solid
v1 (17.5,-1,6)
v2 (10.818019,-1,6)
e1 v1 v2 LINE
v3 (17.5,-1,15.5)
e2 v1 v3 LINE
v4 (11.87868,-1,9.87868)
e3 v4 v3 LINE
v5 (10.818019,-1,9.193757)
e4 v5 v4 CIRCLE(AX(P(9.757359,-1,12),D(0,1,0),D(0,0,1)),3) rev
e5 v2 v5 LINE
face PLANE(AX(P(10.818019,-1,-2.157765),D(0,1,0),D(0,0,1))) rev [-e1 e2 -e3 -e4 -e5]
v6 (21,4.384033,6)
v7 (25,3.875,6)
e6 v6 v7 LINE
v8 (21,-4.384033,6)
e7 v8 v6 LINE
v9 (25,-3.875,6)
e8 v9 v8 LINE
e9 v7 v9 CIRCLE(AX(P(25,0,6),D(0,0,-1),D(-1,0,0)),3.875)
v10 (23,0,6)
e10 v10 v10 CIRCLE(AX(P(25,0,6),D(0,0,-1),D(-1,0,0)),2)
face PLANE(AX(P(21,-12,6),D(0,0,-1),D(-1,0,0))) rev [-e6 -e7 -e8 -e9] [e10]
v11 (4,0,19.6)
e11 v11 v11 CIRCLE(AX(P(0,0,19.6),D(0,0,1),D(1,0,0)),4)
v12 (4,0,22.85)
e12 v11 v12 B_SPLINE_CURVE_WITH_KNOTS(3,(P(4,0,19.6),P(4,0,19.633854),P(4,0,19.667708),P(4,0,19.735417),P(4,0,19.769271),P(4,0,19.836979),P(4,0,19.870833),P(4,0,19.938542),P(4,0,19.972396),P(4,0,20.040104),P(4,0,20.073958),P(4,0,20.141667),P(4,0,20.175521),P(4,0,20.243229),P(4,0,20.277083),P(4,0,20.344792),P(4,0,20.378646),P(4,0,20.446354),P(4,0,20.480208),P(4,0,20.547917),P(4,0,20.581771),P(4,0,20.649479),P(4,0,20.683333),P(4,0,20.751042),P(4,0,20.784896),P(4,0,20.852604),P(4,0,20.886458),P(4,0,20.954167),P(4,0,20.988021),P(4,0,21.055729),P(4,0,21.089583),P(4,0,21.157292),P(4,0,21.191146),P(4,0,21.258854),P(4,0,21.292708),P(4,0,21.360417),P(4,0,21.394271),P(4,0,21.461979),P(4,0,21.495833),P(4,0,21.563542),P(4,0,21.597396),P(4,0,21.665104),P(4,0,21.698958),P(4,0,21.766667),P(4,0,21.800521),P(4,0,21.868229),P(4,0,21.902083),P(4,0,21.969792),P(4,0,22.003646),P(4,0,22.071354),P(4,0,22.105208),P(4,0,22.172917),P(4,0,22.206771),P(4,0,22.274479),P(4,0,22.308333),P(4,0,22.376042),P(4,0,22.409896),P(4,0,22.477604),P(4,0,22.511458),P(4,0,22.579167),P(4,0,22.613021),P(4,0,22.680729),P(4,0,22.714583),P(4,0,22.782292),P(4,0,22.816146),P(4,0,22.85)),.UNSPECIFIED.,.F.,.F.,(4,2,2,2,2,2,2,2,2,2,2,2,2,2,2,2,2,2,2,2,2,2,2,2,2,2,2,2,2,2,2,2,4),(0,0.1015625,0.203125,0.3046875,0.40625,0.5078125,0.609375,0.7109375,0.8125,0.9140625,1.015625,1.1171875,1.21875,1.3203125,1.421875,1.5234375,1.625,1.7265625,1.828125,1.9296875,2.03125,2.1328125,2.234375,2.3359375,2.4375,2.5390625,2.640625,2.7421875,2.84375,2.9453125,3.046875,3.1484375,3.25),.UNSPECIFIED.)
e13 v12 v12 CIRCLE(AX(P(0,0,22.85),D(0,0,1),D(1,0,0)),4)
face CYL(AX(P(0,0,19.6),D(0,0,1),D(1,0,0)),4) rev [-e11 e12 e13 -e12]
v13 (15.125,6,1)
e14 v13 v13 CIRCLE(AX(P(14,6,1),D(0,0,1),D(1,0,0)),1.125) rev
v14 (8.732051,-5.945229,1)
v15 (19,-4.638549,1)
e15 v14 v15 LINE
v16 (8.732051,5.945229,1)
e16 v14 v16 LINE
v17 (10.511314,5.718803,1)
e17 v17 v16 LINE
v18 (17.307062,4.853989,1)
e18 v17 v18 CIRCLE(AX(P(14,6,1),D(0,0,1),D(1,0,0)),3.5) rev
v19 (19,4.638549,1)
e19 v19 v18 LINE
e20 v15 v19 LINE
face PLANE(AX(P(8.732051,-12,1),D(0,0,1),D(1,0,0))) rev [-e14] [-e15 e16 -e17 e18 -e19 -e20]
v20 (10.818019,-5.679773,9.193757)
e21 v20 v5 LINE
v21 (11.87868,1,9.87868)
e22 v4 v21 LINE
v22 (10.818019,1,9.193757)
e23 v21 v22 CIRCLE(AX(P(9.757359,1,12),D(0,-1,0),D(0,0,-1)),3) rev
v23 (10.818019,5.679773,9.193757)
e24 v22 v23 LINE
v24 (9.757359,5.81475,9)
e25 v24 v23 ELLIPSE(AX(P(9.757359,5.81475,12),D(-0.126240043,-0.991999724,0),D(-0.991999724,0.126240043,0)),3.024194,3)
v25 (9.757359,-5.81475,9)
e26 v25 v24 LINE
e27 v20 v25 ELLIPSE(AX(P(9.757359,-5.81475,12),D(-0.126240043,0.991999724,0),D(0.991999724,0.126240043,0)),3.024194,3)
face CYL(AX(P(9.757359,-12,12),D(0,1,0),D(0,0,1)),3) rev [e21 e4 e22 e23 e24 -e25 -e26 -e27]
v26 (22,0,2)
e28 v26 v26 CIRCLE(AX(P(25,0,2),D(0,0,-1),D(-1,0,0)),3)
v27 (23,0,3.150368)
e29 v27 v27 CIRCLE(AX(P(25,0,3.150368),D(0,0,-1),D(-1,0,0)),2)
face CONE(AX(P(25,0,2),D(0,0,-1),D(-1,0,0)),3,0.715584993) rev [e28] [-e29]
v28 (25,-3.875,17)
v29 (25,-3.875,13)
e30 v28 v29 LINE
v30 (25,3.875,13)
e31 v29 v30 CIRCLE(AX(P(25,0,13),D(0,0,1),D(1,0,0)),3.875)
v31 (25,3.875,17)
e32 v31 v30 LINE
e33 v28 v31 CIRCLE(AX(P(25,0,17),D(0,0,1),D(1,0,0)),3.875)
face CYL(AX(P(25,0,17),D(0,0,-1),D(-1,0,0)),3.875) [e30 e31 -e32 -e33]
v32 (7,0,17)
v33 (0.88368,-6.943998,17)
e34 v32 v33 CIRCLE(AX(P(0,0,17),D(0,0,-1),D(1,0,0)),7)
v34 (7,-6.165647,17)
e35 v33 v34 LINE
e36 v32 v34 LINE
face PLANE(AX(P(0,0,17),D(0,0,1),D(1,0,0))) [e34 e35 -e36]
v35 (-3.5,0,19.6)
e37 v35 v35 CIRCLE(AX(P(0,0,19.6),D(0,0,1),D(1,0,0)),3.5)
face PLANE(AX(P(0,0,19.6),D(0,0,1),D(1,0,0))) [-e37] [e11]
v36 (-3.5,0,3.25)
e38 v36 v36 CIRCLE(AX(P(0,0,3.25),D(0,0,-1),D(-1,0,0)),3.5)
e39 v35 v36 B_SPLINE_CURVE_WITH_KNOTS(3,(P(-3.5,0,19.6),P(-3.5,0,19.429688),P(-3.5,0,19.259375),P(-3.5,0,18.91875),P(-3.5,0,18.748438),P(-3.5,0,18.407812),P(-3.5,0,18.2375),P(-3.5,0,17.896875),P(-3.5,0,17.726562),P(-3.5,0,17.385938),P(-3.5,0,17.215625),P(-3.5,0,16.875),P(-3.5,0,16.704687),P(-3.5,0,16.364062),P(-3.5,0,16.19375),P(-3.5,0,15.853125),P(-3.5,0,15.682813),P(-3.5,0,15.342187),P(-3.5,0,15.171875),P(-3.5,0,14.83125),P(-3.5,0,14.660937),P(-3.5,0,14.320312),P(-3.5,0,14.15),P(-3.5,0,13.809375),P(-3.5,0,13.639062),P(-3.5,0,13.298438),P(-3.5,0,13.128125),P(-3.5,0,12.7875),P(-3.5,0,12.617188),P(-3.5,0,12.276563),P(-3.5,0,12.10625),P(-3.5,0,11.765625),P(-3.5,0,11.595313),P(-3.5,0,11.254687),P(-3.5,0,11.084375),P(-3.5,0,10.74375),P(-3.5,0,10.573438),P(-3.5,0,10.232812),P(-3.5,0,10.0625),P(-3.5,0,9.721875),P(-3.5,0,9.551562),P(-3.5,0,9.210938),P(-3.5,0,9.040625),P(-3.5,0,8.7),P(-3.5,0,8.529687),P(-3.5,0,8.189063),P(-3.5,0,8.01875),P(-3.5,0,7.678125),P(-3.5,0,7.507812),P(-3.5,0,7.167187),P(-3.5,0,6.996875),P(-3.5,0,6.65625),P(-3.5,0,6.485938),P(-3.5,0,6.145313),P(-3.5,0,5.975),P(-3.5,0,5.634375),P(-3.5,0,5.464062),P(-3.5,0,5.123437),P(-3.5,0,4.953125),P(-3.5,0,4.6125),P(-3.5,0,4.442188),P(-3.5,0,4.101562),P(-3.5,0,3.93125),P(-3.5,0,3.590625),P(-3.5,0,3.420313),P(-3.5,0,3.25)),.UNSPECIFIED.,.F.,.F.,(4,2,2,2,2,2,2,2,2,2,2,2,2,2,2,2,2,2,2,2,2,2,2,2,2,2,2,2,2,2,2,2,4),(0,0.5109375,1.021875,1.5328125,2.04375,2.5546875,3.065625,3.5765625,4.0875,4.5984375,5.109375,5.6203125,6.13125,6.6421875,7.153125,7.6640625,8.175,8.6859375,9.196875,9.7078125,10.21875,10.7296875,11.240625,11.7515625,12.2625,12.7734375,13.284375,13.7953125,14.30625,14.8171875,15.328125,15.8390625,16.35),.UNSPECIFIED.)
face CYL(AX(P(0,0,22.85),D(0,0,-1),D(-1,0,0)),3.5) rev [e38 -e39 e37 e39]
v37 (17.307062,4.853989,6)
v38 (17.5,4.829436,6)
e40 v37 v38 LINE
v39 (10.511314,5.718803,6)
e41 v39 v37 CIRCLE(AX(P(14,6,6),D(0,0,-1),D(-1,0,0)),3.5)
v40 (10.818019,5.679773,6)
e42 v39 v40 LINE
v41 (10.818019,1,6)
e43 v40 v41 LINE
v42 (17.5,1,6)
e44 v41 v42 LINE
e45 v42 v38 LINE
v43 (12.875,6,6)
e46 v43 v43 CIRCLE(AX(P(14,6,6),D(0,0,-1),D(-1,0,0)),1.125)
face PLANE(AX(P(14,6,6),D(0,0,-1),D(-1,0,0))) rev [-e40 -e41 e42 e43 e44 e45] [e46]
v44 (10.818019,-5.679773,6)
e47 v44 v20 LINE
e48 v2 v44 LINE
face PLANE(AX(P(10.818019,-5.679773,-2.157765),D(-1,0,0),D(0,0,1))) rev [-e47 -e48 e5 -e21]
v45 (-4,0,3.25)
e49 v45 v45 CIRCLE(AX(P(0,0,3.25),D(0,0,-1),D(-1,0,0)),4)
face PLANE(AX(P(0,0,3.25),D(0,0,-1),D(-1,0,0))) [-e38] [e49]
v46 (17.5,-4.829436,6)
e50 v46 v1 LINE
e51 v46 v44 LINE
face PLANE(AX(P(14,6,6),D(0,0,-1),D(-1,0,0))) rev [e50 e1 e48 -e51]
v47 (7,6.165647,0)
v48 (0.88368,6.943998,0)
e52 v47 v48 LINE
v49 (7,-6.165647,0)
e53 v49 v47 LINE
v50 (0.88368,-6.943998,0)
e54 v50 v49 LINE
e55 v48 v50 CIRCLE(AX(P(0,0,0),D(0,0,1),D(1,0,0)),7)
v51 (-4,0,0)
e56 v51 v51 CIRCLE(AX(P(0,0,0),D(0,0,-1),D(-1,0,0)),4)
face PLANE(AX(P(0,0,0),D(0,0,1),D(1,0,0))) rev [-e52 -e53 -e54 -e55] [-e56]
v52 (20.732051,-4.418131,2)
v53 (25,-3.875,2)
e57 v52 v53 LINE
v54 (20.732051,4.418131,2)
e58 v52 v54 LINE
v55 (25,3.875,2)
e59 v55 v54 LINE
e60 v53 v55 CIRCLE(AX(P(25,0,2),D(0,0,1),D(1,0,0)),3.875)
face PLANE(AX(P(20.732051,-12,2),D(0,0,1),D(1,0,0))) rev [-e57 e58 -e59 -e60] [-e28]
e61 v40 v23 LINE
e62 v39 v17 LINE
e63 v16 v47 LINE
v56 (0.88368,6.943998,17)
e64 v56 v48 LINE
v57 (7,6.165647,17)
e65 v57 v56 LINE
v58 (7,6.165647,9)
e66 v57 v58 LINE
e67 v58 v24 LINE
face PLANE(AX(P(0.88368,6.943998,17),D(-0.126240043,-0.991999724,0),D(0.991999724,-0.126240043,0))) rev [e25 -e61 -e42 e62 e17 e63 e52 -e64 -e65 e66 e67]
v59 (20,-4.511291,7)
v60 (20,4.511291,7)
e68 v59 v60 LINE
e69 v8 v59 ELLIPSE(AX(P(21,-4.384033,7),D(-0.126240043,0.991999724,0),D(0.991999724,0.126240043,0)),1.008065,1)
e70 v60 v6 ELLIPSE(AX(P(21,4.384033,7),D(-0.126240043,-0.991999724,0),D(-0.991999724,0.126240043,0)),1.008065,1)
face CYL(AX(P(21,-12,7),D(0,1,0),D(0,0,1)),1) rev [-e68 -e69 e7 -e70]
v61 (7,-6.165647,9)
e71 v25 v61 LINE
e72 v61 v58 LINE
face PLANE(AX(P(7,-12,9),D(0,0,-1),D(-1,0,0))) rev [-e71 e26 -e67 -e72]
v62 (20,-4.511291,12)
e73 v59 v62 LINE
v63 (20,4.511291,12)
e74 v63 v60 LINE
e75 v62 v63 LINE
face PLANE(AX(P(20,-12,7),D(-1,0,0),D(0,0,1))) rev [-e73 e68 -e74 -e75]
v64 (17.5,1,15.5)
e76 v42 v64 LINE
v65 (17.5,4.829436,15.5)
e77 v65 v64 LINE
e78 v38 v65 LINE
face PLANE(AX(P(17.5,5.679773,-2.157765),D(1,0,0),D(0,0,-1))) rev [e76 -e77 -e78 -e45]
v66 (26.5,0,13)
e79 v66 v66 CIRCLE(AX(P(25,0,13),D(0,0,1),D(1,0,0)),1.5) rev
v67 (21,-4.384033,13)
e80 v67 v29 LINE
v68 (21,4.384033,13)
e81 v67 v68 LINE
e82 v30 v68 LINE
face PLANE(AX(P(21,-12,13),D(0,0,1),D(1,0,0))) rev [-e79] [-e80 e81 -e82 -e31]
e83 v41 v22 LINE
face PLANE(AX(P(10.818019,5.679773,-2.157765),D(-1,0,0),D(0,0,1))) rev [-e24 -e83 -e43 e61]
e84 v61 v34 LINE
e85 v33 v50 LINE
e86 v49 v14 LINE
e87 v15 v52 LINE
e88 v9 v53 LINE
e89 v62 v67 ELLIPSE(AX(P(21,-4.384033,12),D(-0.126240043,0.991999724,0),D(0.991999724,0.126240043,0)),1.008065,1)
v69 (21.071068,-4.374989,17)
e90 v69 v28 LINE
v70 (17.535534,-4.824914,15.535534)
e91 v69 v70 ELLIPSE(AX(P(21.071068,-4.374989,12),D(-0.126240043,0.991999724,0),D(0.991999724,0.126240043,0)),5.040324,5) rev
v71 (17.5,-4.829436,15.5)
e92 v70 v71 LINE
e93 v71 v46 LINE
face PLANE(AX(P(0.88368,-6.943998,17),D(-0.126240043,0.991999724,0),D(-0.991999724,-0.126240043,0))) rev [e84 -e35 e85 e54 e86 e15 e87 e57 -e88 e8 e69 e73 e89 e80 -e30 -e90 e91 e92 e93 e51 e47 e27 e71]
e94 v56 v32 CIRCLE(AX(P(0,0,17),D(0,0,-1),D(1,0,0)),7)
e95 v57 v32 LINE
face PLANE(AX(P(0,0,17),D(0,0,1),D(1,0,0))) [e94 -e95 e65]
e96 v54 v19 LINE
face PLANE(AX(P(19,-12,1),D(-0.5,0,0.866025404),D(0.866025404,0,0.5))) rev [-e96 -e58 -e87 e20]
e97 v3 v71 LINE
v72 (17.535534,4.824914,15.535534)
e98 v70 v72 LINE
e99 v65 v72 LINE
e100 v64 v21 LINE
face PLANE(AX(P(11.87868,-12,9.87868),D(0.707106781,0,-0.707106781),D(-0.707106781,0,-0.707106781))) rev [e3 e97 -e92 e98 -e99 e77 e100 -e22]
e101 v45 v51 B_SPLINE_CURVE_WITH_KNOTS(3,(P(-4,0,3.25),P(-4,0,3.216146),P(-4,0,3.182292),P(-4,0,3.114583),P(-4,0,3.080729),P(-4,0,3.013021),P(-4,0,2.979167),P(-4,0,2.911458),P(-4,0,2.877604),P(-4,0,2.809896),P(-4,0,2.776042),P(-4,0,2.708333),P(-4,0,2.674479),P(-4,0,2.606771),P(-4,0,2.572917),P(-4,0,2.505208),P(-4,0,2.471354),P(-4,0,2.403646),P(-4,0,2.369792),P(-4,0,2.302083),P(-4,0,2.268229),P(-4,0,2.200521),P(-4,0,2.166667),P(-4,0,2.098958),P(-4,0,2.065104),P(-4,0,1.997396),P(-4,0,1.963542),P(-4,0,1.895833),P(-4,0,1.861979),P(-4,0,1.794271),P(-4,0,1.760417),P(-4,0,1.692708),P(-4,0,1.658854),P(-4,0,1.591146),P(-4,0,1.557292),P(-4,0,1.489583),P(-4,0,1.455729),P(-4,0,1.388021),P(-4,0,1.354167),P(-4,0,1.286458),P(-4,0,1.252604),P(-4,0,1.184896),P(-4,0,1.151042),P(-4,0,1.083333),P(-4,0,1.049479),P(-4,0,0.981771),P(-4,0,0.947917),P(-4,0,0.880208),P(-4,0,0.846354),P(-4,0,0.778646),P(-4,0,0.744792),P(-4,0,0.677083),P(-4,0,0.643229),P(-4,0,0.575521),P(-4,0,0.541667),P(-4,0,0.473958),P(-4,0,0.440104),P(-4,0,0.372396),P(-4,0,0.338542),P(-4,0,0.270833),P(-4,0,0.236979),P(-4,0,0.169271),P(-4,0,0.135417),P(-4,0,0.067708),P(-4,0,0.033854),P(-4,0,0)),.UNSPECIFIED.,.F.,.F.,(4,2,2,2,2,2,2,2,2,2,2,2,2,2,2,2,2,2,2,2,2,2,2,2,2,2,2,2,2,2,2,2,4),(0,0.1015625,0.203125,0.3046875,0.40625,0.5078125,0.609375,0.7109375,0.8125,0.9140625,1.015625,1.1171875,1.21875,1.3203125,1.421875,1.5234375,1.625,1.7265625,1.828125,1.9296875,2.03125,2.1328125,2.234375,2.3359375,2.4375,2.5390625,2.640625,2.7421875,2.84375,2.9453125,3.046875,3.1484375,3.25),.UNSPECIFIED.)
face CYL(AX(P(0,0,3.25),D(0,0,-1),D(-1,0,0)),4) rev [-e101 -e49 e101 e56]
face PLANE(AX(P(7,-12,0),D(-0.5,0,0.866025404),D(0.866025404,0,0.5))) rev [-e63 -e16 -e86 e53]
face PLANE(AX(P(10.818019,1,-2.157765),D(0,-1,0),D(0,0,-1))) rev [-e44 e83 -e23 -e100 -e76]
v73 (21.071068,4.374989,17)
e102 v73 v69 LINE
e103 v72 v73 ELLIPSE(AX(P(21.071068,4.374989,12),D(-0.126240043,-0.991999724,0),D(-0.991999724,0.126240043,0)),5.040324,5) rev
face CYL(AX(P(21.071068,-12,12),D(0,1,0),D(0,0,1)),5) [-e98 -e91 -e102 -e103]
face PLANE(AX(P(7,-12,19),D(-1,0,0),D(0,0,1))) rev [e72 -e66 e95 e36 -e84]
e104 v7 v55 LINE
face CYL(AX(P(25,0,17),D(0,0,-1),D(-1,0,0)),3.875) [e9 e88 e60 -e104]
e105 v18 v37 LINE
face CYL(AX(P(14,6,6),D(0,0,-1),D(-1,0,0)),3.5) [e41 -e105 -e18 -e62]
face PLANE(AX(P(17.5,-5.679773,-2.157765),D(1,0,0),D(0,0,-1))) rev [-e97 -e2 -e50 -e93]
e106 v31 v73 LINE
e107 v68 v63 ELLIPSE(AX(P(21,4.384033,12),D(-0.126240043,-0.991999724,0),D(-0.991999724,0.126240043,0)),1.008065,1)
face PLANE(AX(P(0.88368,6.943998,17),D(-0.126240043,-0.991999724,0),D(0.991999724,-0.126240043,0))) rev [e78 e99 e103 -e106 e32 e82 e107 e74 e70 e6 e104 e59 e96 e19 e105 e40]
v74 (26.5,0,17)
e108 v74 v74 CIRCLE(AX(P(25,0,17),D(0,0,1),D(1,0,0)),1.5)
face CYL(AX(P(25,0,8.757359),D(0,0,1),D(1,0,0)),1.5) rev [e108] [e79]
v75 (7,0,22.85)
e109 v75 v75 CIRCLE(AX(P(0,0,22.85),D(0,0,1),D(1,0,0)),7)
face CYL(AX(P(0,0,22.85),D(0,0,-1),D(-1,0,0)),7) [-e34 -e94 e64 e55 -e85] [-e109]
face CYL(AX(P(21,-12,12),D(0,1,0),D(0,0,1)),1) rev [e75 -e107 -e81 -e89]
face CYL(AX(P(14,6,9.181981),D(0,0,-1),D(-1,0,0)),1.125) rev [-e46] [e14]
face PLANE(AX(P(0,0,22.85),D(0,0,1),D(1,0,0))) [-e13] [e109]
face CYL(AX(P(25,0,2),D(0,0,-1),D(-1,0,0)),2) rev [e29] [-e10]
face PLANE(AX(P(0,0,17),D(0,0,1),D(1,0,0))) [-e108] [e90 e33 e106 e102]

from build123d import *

# Parameters (mm, degrees)
SKETCH1_R                = 7
SKETCH1_R_2              = 3.5
CYLINDER_DEPTH           = 22.85
SKETCH2_R                = 4
BORE_1_DEPTH             = 3.25
BORE_START               = -3.25
SKETCH3_R                = 4
BORE_2_DEPTH             = 3.25
ARM_DEPTH                = 17
SKETCH5_R                = 3.5
OUTER_HOLE_SURFACE_DEPTH = 6
SKETCH6_R                = 1.125
OUTER_HOLE_DEPTH         = 6
SIDE_FEATURES_DEPTH      = 22
RIB_START                = -11
SKETCH10_W               = 6.681980515
SKETCH10_H               = 4.679772507
RIB_DEPTH                = 9.5
SKETCH13_R               = 1.5
BOTTOM_HOLE_DEPTH        = 4


# Read off the part's stored shape, not the designer's step: Top Counter-sunk
with BuildPart() as part:
    # Sketch1 → Cylinder (new body)
    with BuildSketch(Plane.XY):
        with Locations(Location((0, 0, 0), (0, 0, 180))):
            Circle(SKETCH1_R)
        with Locations(Location((0, 0, 0), (0, 0, 180))):
            Circle(SKETCH1_R_2, mode=Mode.SUBTRACT)
    extrude(amount=CYLINDER_DEPTH)

    # Sketch2 → Bore 1 (cut)
    with BuildSketch(Plane.XY.offset(22.85)):
        Circle(SKETCH2_R)
    extrude(amount=-BORE_1_DEPTH, mode=Mode.SUBTRACT)

    # Sketch3 → Bore 2 (cut)
    with BuildSketch(Plane(origin=(0, 0, 0), x_dir=(-1, 0, 0), z_dir=(0, 0, -1)).offset(BORE_START)):
        with Locations(Location((0, 0, 0), (0, 0, 180))):
            Circle(SKETCH3_R)
    extrude(amount=BORE_2_DEPTH, mode=Mode.SUBTRACT)

    # Sketch4 → Arm (add)
    with BuildSketch(Plane.XY):
        with BuildLine():
            Line((0.8836803, 6.943998065), (25, 3.875))
            ThreePointArc((25, 3.875), (28.875, 0), (25, -3.875))
            Line((25, -3.875), (0.8836803, -6.943998065))
            ThreePointArc((0.8836803, -6.943998065), (7, 0), (0.8836803, 6.943998065))
        make_face()
    extrude(amount=ARM_DEPTH)

    # Sketch5 → Outer Hole surface (add)
    with BuildSketch(Plane(origin=(0, 0, 0), x_dir=(-1, 0, 0), z_dir=(0, 0, -1))):
        with Locations((-14, 6)):
            Circle(SKETCH5_R)
    extrude(amount=-OUTER_HOLE_SURFACE_DEPTH)

    # Sketch6 → Outer hole (cut)
    with BuildSketch(Plane(origin=(0, 0, 0), x_dir=(-1, 0, 0), z_dir=(0, 0, -1))):
        with Locations((-14, 6)):
            Circle(SKETCH6_R)
    extrude(amount=-OUTER_HOLE_DEPTH, mode=Mode.SUBTRACT)

    # Sketch8 → side Features (cut)
    with BuildSketch(Plane(origin=(0, 10, 0), x_dir=(1, 0, 0), z_dir=(0, 1, 0))):
        with BuildLine():
            Line((21, -6), (40, -6))
            Line((40, -6), (40, -13))
            Line((40, -13), (21, -13))
            ThreePointArc((21, -13), (20.292893219, -12.707106781), (20, -12))
            Line((20, -12), (20, -7))
            ThreePointArc((20, -7), (20.292893219, -6.292893219), (21, -6))
        make_face()
        with BuildLine():
            Line((7, -19), (7, -9))
            Line((7, -9), (9.757359313, -9))
            ThreePointArc((9.757359313, -9), (10.90540961, -9.228361402), (11.878679656, -9.878679656))
            Line((11.878679656, -9.878679656), (17.535533906, -15.535533906))
            ThreePointArc((17.535533906, -15.535533906), (19.15765065, -16.619397663), (21.071067812, -17))
            Line((21.071067812, -17), (27, -17))
            Line((27, -17), (27, -19))
            Line((27, -19), (7, -19))
        make_face()
        Polygon((7, 0), (8.732050808, -1), (19, -1), (20.732050808, -2), (40, -2), (40, 0), align=None)
    extrude(amount=-SIDE_FEATURES_DEPTH, mode=Mode.SUBTRACT)

    # Sketch10 → Rib (cut)
    with BuildSketch(Plane.XY.offset(17).offset(RIB_START)):
        with Locations((14.159009743, 3.339886254)):
            Rectangle(SKETCH10_W, SKETCH10_H)
        with Locations((14.159009743, -3.339886254)):
            Rectangle(SKETCH10_W, SKETCH10_H)
    extrude(amount=RIB_DEPTH, mode=Mode.SUBTRACT)

    # Top Counter-sunk outline → Top Counter-sunk (revolve, cut)
    with BuildSketch(Plane(origin=(25, 0, 0), x_dir=(1, 0, 0), z_dir=(0, -1, 0))):
        Polygon((2, 3.150368407), (2, 6), (0, 6), (0, 2), (3, 2), align=None)
    revolve(axis=Axis((25, 0, 0), (0, 0, 1)), mode=Mode.SUBTRACT)

    # Sketch13 → Bottom hole (cut)
    with BuildSketch(Plane.XY.offset(17)):
        with Locations((25, 0)):
            Circle(SKETCH13_R)
    extrude(amount=-BOTTOM_HOLE_DEPTH, mode=Mode.SUBTRACT)


solid = part.part
